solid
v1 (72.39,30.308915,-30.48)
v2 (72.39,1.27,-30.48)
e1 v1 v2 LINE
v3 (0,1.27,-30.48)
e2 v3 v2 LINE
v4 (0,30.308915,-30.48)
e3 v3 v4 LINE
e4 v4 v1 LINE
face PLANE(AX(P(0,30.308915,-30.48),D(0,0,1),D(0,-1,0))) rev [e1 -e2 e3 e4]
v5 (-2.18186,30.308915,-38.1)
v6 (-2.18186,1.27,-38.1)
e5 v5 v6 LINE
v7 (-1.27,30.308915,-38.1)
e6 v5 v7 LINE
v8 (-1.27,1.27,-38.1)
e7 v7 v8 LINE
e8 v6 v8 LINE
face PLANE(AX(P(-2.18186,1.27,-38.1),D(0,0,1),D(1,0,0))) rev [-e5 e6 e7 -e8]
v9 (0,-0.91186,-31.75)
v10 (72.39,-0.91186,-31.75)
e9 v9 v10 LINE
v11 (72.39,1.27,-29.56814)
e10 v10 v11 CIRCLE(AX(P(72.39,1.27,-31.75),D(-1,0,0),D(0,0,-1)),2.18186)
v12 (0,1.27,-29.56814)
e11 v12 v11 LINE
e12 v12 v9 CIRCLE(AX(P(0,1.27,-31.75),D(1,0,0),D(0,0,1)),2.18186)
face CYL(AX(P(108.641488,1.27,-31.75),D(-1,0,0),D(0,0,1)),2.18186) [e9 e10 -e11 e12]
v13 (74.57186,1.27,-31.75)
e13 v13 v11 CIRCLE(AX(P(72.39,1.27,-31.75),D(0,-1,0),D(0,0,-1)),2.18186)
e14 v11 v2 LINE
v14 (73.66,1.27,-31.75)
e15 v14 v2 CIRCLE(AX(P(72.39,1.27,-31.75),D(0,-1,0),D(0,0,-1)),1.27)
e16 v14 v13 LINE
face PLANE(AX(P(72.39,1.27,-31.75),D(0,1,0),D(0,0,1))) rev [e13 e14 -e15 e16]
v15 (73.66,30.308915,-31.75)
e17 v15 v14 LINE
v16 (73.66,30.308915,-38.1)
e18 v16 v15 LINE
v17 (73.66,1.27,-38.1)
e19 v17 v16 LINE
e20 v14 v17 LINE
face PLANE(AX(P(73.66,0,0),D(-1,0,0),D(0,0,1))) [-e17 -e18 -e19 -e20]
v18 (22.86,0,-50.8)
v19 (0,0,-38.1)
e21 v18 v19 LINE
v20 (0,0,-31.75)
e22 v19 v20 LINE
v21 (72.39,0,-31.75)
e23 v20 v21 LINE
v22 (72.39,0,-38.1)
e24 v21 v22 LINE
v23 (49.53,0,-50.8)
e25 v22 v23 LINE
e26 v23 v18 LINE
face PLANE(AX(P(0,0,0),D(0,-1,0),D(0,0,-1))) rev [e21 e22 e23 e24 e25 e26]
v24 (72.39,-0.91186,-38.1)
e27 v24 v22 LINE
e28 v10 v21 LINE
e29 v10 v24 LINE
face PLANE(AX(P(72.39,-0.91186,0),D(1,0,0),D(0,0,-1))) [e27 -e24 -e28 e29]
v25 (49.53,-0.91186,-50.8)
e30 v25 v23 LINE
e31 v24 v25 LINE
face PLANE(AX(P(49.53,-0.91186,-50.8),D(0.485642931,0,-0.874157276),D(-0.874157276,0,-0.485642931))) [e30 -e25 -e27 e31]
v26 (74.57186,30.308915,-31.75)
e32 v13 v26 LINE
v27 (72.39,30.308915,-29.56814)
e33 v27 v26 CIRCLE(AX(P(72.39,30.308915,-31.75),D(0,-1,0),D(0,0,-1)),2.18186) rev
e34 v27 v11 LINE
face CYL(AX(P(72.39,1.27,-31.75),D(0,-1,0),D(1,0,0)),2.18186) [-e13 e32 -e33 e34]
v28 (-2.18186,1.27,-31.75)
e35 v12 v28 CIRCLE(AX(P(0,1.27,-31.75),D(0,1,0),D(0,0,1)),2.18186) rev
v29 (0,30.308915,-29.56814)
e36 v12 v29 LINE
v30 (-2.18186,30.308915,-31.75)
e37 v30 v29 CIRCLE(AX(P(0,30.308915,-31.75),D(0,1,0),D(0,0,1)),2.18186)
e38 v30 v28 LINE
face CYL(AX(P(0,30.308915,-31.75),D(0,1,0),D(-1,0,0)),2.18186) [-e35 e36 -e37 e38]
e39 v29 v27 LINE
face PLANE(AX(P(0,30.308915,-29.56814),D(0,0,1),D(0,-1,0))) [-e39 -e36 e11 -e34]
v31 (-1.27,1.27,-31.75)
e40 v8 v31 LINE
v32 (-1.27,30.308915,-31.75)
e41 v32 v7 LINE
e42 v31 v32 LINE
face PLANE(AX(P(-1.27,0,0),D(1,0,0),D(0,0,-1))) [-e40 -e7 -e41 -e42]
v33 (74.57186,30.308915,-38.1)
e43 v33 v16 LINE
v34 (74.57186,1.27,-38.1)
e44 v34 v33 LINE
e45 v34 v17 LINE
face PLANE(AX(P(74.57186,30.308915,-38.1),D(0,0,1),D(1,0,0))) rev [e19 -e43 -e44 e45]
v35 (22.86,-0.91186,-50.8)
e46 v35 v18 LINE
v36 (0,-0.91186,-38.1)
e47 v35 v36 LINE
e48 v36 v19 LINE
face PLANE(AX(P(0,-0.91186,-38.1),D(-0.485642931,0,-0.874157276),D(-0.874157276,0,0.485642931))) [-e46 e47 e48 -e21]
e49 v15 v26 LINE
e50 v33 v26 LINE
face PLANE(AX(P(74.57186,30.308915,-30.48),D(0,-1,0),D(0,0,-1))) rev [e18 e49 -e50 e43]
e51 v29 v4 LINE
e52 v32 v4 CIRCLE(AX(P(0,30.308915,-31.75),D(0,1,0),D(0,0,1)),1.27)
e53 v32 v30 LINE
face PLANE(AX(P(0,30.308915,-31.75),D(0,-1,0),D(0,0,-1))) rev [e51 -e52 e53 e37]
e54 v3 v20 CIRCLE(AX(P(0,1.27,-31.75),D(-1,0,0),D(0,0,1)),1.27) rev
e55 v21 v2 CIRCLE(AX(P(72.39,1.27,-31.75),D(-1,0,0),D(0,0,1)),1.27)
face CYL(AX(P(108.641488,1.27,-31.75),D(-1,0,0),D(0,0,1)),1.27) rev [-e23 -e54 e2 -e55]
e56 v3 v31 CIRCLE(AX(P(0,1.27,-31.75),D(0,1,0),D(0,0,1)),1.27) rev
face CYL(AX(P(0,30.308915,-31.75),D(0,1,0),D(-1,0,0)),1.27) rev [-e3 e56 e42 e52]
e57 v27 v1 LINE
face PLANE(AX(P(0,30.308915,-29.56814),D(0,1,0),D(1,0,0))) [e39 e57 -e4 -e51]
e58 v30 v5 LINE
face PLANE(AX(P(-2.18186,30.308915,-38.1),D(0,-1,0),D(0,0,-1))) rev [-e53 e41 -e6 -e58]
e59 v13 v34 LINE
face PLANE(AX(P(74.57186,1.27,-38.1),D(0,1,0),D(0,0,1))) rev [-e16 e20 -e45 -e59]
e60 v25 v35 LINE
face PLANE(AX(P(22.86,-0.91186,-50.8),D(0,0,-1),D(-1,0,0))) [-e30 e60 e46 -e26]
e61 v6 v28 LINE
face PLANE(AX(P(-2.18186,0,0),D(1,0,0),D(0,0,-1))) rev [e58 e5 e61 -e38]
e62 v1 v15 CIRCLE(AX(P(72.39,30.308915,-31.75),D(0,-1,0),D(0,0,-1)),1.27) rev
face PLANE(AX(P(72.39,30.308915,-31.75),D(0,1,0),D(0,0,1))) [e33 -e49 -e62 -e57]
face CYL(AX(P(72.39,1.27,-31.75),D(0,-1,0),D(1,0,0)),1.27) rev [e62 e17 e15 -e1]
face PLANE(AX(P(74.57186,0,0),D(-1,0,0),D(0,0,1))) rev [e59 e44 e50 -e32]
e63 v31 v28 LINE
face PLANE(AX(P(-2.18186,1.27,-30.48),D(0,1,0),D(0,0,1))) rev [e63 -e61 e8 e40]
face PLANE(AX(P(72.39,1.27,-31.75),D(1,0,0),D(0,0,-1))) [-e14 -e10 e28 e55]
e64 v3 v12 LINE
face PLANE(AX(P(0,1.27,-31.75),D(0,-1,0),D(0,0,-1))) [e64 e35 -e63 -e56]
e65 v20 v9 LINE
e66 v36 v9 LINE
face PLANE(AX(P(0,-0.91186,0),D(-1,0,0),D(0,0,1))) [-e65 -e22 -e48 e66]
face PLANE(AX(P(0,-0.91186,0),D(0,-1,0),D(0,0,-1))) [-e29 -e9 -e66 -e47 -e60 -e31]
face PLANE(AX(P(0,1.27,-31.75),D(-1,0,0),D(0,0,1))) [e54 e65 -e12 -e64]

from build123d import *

# Parameters (mm, degrees)
BASE_FLANGE1_DEPTH     = 0.91186
SKETCHED_BEND1_DEPTH   = 72.39
SKETCHED_BEND1_2_DEPTH = 72.39
EDGE_FLANGE1_DEPTH     = 29.038915496
EDGE_FLANGE2_DEPTH     = 29.038915496


# Read off the part's stored shape, not the designer's step: Sketched Bend1
# Sheet-metal steps are written as plain solids
with BuildPart() as part:
    # Sketch1 → Base-Flange1 (new body)
    with BuildSketch(Plane(origin=(0, 0, 0), x_dir=(1, 0, 0), z_dir=(0, 1, 0))):
        Polygon((0, 38.1), (22.86, 50.8), (49.53, 50.8), (72.39, 38.1), (72.39, 0), (0, 0), align=None)
    extrude(amount=-BASE_FLANGE1_DEPTH)

    # Sketched Bend1 outline → Sketched Bend1 (cut)
    with BuildSketch(Plane.YZ):
        with BuildLine():
            ThreePointArc((-0.91186, -31.75), (-0.670550858, -30.752615706), (0, -29.975848636))
            Line((0, -29.975848636), (0, 0))
            Line((0, 0), (-0.91186, 0))
            Line((-0.91186, 0), (-0.91186, -31.75))
        make_face()
    extrude(amount=SKETCHED_BEND1_DEPTH, mode=Mode.SUBTRACT)

    # Sketched Bend1 2 outline → Sketched Bend1 2 (add)
    with BuildSketch(Plane.YZ):
        with BuildLine():
            Line((30.308915496, -30.48), (30.308915496, -29.56814))
            Line((30.308915496, -29.56814), (1.27, -29.56814))
            ThreePointArc((1.27, -29.56814), (0.603080527, -29.672566131), (0, -29.975848636))
            Line((0, -29.975848636), (0, -31.75))
            ThreePointArc((0, -31.75), (0.371974388, -30.851974388), (1.27, -30.48))
            Line((1.27, -30.48), (30.308915496, -30.48))
        make_face()
    extrude(amount=SKETCHED_BEND1_2_DEPTH)

    # Edge-Flange1 section (across the edge) → Edge-Flange1 (add)
    with BuildSketch(Plane(origin=(-1.27, 1.27, -30.48), x_dir=(1, 0, 0), z_dir=(0, 1, 0))):
        with BuildLine():
            Line((-0.91186, 1.27), (-0.91186, 7.62))
            Line((-0.91186, 7.62), (0, 7.62))
            Line((0, 7.62), (0, 1.27))
            ThreePointArc((0, 1.27), (0.371974388, 0.371974388), (1.27, 0))
            Line((1.27, 0), (1.27, -0.91186))
            ThreePointArc((1.27, -0.91186), (-0.272808002, -0.272808002), (-0.91186, 1.27))
        make_face()
    extrude(amount=EDGE_FLANGE1_DEPTH)

    # Edge-Flange2 section (across the edge) → Edge-Flange2 (add)
    with BuildSketch(Plane(origin=(73.66, 30.308915496, -30.48), x_dir=(-1, 0, 0), z_dir=(0, -1, 0))):
        with BuildLine():
            Line((-0.91186, 1.27), (-0.91186, 7.62))
            Line((-0.91186, 7.62), (0, 7.62))
            Line((0, 7.62), (0, 1.27))
            ThreePointArc((0, 1.27), (0.371974388, 0.371974388), (1.27, 0))
            Line((1.27, 0), (1.27, -0.91186))
            ThreePointArc((1.27, -0.91186), (-0.272808002, -0.272808002), (-0.91186, 1.27))
        make_face()
    extrude(amount=EDGE_FLANGE2_DEPTH)


solid = part.part
